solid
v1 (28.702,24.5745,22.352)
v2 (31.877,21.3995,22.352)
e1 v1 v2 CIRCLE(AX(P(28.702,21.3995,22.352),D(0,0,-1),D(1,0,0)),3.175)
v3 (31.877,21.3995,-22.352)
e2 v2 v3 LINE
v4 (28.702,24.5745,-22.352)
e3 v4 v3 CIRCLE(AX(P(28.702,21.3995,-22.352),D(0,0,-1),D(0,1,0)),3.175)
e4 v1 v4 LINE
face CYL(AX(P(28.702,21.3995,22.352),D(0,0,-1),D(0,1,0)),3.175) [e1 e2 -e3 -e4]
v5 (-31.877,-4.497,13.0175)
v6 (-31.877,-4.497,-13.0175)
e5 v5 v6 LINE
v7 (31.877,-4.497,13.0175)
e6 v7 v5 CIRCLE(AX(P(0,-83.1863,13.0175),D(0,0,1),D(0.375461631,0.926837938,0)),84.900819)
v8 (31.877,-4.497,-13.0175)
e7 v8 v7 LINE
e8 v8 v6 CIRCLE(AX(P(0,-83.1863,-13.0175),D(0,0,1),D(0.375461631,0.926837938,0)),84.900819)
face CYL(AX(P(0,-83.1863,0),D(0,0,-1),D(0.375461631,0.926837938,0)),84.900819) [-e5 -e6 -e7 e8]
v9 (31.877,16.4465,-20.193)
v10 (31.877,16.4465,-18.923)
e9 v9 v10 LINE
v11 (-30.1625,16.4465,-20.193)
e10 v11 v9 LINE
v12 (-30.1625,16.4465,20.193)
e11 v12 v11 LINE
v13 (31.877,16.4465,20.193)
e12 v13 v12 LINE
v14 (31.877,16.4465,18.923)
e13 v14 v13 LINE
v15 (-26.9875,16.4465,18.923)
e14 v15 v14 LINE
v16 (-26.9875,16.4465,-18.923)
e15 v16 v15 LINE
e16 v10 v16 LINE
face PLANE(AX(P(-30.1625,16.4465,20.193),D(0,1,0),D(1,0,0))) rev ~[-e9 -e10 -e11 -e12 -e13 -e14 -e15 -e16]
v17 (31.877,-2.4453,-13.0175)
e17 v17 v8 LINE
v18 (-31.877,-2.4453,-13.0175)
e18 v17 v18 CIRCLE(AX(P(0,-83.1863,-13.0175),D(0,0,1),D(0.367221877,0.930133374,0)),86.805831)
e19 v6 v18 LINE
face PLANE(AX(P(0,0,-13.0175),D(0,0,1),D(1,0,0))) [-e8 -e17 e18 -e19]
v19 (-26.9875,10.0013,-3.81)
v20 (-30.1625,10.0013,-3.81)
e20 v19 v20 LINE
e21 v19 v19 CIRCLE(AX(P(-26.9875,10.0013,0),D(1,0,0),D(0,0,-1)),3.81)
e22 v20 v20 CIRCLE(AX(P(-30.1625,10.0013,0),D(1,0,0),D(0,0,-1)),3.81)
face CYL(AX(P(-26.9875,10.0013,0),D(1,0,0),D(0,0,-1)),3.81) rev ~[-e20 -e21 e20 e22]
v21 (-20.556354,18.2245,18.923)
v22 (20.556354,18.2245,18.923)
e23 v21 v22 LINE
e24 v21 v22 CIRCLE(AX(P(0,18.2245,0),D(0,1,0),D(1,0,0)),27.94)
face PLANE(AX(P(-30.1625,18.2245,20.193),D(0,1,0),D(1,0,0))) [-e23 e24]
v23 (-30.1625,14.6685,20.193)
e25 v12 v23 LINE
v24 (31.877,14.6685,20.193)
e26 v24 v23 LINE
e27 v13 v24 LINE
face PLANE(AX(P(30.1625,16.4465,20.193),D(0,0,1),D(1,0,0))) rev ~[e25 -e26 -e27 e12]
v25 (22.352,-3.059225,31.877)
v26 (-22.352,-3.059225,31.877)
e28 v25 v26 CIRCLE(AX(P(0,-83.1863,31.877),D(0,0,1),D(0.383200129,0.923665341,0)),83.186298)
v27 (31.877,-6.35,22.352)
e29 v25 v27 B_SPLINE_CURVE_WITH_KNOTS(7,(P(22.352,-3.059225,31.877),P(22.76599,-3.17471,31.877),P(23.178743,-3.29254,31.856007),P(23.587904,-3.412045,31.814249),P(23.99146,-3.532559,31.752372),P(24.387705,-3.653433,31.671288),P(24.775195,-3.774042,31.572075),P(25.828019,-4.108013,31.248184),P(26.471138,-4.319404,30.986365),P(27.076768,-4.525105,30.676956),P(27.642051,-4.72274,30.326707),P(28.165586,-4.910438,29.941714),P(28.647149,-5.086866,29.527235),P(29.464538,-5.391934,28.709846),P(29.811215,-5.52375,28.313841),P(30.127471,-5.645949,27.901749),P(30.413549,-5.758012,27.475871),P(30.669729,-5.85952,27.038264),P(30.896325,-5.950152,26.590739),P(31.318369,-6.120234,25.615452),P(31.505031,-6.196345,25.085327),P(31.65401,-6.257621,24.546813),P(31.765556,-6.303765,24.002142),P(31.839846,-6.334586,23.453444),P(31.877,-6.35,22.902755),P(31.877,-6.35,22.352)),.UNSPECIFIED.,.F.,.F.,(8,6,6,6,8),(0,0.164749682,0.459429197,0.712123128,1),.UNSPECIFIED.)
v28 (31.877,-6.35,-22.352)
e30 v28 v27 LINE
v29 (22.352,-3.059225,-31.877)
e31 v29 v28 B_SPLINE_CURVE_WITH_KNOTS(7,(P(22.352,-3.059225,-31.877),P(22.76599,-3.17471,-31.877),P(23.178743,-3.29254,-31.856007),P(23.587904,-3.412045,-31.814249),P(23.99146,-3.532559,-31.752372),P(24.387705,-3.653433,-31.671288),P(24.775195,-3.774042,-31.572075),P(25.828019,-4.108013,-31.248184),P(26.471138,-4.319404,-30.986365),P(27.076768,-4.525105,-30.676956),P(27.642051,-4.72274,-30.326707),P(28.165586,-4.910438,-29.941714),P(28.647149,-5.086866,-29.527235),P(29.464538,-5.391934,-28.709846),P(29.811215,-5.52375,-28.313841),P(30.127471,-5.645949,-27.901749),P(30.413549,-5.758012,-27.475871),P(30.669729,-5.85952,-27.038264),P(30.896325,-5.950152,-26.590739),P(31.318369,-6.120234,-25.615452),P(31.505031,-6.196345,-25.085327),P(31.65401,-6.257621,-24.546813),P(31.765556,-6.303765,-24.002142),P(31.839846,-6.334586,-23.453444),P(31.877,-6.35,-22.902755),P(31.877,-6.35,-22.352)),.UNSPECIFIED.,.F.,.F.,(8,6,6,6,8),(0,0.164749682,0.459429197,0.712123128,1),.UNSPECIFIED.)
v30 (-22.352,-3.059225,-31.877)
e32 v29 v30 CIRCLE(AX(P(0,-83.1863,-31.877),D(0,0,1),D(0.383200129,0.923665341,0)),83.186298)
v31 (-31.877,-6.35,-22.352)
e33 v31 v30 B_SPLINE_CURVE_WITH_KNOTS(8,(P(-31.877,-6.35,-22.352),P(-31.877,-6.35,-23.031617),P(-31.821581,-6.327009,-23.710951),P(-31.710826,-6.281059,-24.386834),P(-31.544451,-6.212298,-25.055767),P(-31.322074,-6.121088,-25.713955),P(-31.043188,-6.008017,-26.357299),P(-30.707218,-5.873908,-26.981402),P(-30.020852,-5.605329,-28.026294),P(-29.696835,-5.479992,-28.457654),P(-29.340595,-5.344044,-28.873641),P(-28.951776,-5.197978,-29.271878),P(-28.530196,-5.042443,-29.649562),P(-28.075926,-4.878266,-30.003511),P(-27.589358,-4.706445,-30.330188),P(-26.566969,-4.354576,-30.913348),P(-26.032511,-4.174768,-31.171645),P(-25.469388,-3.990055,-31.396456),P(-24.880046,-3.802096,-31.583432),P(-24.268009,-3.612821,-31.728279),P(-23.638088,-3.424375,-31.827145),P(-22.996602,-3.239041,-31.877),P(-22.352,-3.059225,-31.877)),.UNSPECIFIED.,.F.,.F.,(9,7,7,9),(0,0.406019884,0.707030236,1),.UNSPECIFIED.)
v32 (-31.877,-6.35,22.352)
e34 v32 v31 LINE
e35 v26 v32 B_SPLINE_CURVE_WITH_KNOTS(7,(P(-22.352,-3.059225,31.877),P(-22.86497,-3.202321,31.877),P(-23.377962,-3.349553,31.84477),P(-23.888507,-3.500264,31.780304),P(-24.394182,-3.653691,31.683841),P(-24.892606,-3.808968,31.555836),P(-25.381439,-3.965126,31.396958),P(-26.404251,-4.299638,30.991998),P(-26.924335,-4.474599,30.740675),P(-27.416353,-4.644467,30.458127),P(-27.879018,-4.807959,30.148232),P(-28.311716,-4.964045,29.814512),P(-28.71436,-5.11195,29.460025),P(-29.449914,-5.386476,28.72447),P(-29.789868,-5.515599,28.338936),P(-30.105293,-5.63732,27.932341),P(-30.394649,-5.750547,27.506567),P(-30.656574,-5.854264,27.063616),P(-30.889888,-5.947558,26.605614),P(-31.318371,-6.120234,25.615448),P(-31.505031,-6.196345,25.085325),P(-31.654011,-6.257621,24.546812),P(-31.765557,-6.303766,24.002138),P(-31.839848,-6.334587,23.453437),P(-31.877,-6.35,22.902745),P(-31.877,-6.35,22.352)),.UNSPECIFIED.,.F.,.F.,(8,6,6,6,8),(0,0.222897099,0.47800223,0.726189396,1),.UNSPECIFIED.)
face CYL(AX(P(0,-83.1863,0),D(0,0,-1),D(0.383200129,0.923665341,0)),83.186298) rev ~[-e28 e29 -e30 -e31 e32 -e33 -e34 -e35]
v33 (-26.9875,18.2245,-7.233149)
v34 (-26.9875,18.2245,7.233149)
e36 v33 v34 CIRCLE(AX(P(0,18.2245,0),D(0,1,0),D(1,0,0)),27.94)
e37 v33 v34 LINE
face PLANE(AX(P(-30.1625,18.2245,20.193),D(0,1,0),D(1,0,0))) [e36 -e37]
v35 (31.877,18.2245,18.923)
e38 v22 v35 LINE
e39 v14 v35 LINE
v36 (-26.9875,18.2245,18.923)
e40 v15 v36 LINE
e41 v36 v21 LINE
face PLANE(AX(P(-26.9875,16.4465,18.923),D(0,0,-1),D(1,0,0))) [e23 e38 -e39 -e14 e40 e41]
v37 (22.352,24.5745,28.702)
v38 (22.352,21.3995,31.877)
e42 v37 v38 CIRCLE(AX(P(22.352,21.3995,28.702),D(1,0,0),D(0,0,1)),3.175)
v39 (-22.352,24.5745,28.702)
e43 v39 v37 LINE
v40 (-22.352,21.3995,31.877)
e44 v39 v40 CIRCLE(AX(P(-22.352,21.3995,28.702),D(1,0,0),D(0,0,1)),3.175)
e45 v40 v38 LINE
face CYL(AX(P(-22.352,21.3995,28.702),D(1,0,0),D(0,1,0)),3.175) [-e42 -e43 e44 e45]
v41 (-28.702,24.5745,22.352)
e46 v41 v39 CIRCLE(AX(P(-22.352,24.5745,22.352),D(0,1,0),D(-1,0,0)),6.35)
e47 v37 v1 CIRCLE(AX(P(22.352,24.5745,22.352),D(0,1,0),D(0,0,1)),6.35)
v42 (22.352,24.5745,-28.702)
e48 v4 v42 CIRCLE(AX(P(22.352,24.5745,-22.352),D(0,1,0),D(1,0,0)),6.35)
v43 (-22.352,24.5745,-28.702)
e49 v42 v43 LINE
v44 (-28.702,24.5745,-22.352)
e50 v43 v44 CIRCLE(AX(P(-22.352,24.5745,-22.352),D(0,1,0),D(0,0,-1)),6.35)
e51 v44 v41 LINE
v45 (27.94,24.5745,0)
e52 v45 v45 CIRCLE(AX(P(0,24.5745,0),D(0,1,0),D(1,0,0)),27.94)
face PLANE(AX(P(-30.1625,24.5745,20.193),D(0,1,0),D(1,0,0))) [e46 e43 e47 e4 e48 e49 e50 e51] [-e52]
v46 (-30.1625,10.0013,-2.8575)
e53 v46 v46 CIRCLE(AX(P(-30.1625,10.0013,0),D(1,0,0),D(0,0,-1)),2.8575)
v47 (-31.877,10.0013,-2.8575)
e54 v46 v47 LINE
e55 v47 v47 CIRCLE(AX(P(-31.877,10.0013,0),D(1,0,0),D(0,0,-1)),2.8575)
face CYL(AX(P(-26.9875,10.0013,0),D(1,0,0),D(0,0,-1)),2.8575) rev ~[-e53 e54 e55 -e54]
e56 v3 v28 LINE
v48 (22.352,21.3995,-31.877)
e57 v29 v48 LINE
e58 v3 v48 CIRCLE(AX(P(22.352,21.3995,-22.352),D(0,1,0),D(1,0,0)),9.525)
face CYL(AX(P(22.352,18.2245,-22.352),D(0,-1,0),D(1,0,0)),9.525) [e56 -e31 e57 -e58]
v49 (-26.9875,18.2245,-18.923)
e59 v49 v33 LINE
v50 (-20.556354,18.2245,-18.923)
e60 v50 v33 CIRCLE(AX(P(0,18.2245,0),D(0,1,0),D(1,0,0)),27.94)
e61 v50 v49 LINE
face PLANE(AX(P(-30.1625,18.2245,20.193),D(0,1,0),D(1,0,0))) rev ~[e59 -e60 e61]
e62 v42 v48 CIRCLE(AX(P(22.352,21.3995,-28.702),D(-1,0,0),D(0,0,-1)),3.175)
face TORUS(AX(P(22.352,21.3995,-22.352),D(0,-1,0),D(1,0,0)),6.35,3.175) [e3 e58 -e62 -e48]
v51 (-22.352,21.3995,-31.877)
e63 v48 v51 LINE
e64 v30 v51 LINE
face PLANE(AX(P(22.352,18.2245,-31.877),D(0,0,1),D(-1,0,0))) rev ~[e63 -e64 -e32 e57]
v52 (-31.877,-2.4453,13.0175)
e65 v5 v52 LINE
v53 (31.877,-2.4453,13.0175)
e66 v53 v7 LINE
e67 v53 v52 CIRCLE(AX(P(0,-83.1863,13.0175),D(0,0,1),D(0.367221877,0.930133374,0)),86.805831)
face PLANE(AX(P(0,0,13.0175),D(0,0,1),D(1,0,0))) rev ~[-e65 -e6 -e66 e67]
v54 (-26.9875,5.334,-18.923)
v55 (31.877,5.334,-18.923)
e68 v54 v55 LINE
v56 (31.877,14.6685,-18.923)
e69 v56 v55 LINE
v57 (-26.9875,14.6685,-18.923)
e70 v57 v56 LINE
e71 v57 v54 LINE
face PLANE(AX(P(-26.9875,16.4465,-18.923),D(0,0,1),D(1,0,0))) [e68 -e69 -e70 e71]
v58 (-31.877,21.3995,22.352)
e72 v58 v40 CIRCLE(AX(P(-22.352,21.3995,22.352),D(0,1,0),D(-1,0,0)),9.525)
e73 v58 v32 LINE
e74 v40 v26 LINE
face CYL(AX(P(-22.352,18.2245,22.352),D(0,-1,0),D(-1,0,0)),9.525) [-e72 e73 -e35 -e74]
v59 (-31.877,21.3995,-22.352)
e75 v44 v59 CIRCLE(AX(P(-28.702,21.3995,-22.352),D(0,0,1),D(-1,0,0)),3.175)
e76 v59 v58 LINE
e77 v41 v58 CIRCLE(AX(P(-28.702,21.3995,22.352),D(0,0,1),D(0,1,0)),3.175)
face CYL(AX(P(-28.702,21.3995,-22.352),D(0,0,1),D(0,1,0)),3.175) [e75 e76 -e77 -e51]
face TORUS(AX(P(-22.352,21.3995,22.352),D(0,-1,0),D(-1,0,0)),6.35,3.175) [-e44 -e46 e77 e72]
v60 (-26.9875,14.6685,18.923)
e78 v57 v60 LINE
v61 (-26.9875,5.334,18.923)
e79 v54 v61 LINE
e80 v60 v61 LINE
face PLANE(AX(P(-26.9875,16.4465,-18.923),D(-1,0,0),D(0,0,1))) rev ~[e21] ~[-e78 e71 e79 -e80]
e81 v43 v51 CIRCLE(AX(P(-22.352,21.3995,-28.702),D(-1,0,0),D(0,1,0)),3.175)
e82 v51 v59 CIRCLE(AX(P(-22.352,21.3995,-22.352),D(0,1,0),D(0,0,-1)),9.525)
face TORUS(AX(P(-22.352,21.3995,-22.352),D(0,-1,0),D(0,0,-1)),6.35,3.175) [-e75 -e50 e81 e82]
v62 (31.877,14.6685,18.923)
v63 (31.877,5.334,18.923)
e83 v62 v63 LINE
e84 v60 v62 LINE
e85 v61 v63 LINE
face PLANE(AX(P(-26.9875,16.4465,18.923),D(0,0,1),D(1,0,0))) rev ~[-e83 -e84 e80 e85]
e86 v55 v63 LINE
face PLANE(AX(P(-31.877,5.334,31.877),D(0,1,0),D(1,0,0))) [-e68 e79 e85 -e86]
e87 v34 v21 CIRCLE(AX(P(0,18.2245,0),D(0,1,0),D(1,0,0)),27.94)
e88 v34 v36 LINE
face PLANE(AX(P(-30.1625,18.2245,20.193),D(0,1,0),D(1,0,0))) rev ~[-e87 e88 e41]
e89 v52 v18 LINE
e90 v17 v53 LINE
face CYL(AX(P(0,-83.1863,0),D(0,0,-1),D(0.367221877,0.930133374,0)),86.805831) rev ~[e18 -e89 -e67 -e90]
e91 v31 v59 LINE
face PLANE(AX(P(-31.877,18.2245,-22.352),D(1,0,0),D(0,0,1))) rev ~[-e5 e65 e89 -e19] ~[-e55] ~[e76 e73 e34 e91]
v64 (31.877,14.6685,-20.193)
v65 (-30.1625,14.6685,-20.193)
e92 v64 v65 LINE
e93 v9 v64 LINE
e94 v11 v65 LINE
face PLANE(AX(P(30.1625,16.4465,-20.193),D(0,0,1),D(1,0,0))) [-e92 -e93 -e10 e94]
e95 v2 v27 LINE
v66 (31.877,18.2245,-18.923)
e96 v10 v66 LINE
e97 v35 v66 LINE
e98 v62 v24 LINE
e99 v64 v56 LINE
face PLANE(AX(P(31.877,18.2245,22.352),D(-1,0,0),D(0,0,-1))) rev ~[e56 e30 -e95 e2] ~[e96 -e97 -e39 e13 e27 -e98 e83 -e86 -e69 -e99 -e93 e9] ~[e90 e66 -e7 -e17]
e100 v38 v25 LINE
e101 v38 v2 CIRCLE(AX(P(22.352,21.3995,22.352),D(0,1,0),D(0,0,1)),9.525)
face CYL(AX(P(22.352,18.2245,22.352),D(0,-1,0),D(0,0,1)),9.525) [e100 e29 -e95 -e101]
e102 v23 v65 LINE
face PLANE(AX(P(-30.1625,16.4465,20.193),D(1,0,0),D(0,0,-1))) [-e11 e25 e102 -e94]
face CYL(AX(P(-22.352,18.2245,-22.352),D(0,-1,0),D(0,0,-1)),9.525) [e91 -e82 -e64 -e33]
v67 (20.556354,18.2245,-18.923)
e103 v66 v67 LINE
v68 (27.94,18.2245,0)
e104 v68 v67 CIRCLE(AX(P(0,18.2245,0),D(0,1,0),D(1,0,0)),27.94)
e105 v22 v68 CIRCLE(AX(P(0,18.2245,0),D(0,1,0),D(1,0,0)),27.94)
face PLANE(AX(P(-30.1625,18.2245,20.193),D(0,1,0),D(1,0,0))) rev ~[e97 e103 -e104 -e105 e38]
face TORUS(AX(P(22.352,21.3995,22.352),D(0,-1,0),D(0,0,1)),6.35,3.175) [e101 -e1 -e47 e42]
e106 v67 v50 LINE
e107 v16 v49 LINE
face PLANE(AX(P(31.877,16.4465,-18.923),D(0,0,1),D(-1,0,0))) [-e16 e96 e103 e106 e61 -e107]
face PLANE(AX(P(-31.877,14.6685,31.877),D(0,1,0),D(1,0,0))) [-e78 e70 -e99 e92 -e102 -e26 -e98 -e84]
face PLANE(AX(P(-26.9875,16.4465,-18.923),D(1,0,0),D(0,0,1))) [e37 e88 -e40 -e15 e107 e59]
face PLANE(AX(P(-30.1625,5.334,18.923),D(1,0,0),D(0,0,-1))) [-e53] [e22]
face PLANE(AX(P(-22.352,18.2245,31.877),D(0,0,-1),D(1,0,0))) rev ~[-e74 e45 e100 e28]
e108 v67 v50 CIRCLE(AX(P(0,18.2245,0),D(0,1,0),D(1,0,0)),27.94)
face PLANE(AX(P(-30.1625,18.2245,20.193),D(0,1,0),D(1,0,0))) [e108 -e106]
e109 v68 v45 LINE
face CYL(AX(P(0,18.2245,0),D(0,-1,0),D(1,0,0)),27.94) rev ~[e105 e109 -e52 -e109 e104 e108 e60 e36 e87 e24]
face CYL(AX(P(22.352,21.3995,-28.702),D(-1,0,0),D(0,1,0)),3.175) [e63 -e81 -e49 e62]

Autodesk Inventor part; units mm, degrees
ref_plane "YZ Plane" through (0, 0, 0) normal (1, 0, 0) x (0, 1, 0)
ref_plane "XZ Plane" through (0, 0, 0) normal (0, 1, 0) x (-1, 0, 0)
ref_plane "XY Plane" through (0, 0, 0) normal (0, 0, 1) x (1, 0, 0)
sketch "Sketch1" plane through (0, 0, 0) normal (0, 0, 1) x (1, 0, 0)
  arc A0 (31.877, -6.35) -> (-31.877, -6.35) centre (0, -83.1863) ccw
  line L0 (-31.877, -6.35) -> (31.877, -6.35) construction
  line L1 (0, 36.3731) -> (0, -103.1128) construction
  line L2 (-44.6278, 0) -> (44.6278, 0) construction
  line L3 (-31.877, -6.35) -> (-31.877, -4.497)
  line L4 (-31.877, 16.4465) -> (31.877, 16.4465)
  line L5 (31.877, 16.4465) -> (31.877, -2.4453)
  line L6 (-30.1625, 16.4465) -> (-30.1625, 5.334) construction
  line L7 (-30.1625, 5.334) -> (30.1625, 5.334) construction
  line L8 (30.1625, 5.334) -> (30.1625, 16.4465) construction
  arc A1 (31.877, -4.497) -> (-31.877, -4.497) centre (0, -83.1863) ccw
  arc A2 (31.877, -2.4453) -> (-31.877, -2.4453) centre (0, -83.1863) ccw
  line L9 (-30.1625, 13.1134) -> (-26.9875, 13.1134) construction
  line L10 (-26.9875, 13.1134) -> (-26.9875, 5.334) construction
  line L11 (30.1625, 12.4907) -> (26.9875, 12.4907) construction
  line L12 (26.9875, 12.4907) -> (26.9875, 5.334) construction
  line L13 (-31.877, -2.4453) -> (-31.877, 16.4465)
  line L14 (-31.877, -4.497) -> (-31.877, -2.4453)
  line L15 (31.877, -2.4453) -> (31.877, -4.497)
  line L16 (31.877, -4.497) -> (31.877, -6.35)
  point P0 (0, 0)
  point P1 (0, 3.6195)
  dimension "d0" = 1.7145
  dimension "d2" = 1.7145
  dimension "d3" = 1.905
  dimension "d4" = 1.7145
  dimension "d5" = 1.7145
  dimension "d6" = 11.1125
  dimension "d7" = 3.175
  dimension "d8" = 3.175
  dimension "d10" = 60.325
  dimension "d11" = 6.35
extrude "Extrusion1" add sketch "Sketch1" along normal mid plane 63.754
sketch "Sketch2" plane through (-31.877, 16.4465, 31.877) normal (0, 1, 0) x (1, 0, 0)
  line L0 (62.0395, 1.7145) -> (1.7145, 1.7145)
  line L1 (1.7145, 1.7145) -> (1.7145, 11.684)
  line L2 (1.7145, 62.0395) -> (62.0395, 62.0395)
  line L3 (62.0395, 62.0395) -> (62.0395, 52.07)
  line L4 (62.0395, 1.7145) -> (1.7145, 62.0395) construction
  line L5 (1.7145, 1.7145) -> (62.0395, 62.0395) construction
  line L6 (0, 63.754) -> (0, 0) projected
  line L7 (76.5048, 31.877) -> (-12.7508, 31.877) construction
  line L8 (31.877, 76.5048) -> (31.877, -12.7508) construction
  line L9 (1.7145, 11.684) -> (62.0395, 11.684)
  line L10 (1.7145, 11.684) -> (1.7145, 52.07)
  line L11 (1.7145, 52.07) -> (62.0395, 52.07)
  line L12 (1.7145, 52.07) -> (1.7145, 62.0395)
  line L13 (62.0395, 11.684) -> (62.0395, 1.7145)
  line L14 (0, 63.754) -> (63.754, 63.754) projected
  line L15 (4.8895, 50.8) -> (63.754, 50.8)
  line L16 (4.8895, 50.8) -> (4.8895, 12.954)
  line L17 (63.754, 63.754) -> (63.754, 0) projected
  line L18 (63.754, 50.8) -> (63.754, 12.954)
  line L19 (63.754, 0) -> (63.754, 63.754) projected
  line L20 (4.8895, 12.954) -> (63.754, 12.954)
  line L21 (62.0395, 11.684) -> (63.754, 11.684)
  line L22 (63.754, 12.954) -> (63.754, 11.684)
  line L23 (62.0395, 52.07) -> (63.754, 52.07)
  line L24 (63.754, 52.07) -> (63.754, 50.8)
  point P0 (31.877, 31.877)
  dimension "d14" = 1.7145
  dimension "d17" = 1.7145
  dimension "d34" = 1.27
  dimension "d35" = 1.7145
  dimension "d36" = 3.175
  dimension "d37" = 40.386
extrude "Extrusion2" cut sketch "Sketch2" against normal blind 11.1125 contours L20 L16 L15 L17
extrude "Extrusion3" cut sketch "Sketch2" against normal blind 1.778 contours L9 L10 L11 L23 L17 L15 L16 L20 L21
extrude "Extrusion6" cut sketch "Sketch1" along normal mid plane 26.035 contours A1 L14 A2 L15
fillet "Fillet1" radius 9.525 4 edges at (31.877, 5.0483, 31.877) (31.877, 5.0483, -31.877) (-31.877, 5.0483, 31.877) (-31.877, 5.0483, -31.877)
sketch "Sketch6" plane through (-26.9875, 5.334, 18.923) normal (1, 0, 0) x (0, 0, -1)
  circle A0 centre (18.923, 4.6673) radius 3.81
  circle A1 centre (18.923, 4.6673) radius 2.8575
  line L0 (0, 0) -> (0, 9.3345) projected
  line L1 (37.846, 0) -> (0, 0) projected
  point P0 (18.923, -5.334)
  point P1 (0, 4.6673)
  point P2 (18.923, 0)
  dimension "d38" = 7.62
  dimension "d39" = 5.715
extrude "Extrusion7" cut sketch "Sketch6" against normal up to next contours A1
extrude "Extrusion8" cut sketch "Sketch6" against normal blind 3.175
sketch "Sketch7" plane through (-30.1625, 16.4465, 20.193) normal (0, 1, 0) x (1, 0, 0)
  line L0 (7.8105, 52.07) -> (52.5145, 52.07) projected
  arc A0 (7.8105, 52.07) -> (-1.7145, 42.545) centre (7.8105, 42.545) ccw projected
  arc A1 (62.0395, 42.545) -> (52.5145, 52.07) centre (52.5145, 42.545) ccw projected
  line L1 (-1.7145, -2.159) -> (-1.7145, 42.545) projected
  arc A2 (-1.7145, -2.159) -> (7.8105, -11.684) centre (7.8105, -2.159) ccw projected
  line L2 (52.5145, -11.684) -> (7.8105, -11.684) projected
  arc A3 (52.5145, -11.684) -> (62.0395, -2.159) centre (52.5145, -2.159) ccw projected
  line L3 (62.0395, 42.545) -> (62.0395, 40.386) projected
  line L4 (62.0395, 42.545) -> (62.0395, 39.116)
  line L5 (62.0395, 39.116) -> (3.175, 39.116) projected
  line L6 (3.175, 39.116) -> (3.175, 1.27) projected
  line L7 (3.175, 1.27) -> (62.0395, 1.27) projected
  line L8 (62.0395, 39.116) -> (62.0395, 1.27)
  line L9 (62.0395, 1.27) -> (62.0395, -2.159)
  point P0 (30.1625, 20.193)
extrude "Extrusion9" add sketch "Sketch7" along normal blind 1.778 contours L0 A1 L3 L4 L5 L6 L7 L9 A3 L2 A2 L1 A0
sketch "Sketch8" plane through (-30.1625, 18.2245, 20.193) normal (0, 1, 0) x (1, 0, 0)
  line L0 (52.5145, 52.07) -> (7.8105, 52.07) projected
  arc A0 (62.0395, 42.545) -> (52.5145, 52.07) centre (52.5145, 42.545) ccw projected
  arc A1 (7.8105, 52.07) -> (-1.7145, 42.545) centre (7.8105, 42.545) ccw projected
  line L1 (-1.7145, 42.545) -> (-1.7145, -2.159) projected
  arc A2 (-1.7145, -2.159) -> (7.8105, -11.684) centre (7.8105, -2.159) ccw projected
  line L2 (7.8105, -11.684) -> (52.5145, -11.684) projected
  arc A3 (52.5145, -11.684) -> (62.0395, -2.159) centre (52.5145, -2.159) ccw projected
  line L3 (62.0395, -2.159) -> (62.0395, 42.545) projected
  line L4 (62.0395, 42.545) -> (62.0395, -2.159)
  circle A4 centre (30.1625, 20.193) radius 27.94
  dimension "d47" = 55.88
extrude "Extrusion10" add sketch "Sketch8" along normal blind 6.35
fillet "Fillet2" radius 3.175 8 edges at (29.0872, 24.5745, 29.0872) (31.877, 24.5745, 0) (29.0872, 24.5745, -29.0872) (0, 24.5745, -31.877) (-29.0872, 24.5745, -29.0872) (-31.877, 24.5745, 0) (-29.0872, 24.5745, 29.0872) (0, 24.5745, 31.877)
equation "\"d17\" = d14"
equation "\"d35\" = d17"
equation "\"d18\" = d6"
properties part number "Track v3"
